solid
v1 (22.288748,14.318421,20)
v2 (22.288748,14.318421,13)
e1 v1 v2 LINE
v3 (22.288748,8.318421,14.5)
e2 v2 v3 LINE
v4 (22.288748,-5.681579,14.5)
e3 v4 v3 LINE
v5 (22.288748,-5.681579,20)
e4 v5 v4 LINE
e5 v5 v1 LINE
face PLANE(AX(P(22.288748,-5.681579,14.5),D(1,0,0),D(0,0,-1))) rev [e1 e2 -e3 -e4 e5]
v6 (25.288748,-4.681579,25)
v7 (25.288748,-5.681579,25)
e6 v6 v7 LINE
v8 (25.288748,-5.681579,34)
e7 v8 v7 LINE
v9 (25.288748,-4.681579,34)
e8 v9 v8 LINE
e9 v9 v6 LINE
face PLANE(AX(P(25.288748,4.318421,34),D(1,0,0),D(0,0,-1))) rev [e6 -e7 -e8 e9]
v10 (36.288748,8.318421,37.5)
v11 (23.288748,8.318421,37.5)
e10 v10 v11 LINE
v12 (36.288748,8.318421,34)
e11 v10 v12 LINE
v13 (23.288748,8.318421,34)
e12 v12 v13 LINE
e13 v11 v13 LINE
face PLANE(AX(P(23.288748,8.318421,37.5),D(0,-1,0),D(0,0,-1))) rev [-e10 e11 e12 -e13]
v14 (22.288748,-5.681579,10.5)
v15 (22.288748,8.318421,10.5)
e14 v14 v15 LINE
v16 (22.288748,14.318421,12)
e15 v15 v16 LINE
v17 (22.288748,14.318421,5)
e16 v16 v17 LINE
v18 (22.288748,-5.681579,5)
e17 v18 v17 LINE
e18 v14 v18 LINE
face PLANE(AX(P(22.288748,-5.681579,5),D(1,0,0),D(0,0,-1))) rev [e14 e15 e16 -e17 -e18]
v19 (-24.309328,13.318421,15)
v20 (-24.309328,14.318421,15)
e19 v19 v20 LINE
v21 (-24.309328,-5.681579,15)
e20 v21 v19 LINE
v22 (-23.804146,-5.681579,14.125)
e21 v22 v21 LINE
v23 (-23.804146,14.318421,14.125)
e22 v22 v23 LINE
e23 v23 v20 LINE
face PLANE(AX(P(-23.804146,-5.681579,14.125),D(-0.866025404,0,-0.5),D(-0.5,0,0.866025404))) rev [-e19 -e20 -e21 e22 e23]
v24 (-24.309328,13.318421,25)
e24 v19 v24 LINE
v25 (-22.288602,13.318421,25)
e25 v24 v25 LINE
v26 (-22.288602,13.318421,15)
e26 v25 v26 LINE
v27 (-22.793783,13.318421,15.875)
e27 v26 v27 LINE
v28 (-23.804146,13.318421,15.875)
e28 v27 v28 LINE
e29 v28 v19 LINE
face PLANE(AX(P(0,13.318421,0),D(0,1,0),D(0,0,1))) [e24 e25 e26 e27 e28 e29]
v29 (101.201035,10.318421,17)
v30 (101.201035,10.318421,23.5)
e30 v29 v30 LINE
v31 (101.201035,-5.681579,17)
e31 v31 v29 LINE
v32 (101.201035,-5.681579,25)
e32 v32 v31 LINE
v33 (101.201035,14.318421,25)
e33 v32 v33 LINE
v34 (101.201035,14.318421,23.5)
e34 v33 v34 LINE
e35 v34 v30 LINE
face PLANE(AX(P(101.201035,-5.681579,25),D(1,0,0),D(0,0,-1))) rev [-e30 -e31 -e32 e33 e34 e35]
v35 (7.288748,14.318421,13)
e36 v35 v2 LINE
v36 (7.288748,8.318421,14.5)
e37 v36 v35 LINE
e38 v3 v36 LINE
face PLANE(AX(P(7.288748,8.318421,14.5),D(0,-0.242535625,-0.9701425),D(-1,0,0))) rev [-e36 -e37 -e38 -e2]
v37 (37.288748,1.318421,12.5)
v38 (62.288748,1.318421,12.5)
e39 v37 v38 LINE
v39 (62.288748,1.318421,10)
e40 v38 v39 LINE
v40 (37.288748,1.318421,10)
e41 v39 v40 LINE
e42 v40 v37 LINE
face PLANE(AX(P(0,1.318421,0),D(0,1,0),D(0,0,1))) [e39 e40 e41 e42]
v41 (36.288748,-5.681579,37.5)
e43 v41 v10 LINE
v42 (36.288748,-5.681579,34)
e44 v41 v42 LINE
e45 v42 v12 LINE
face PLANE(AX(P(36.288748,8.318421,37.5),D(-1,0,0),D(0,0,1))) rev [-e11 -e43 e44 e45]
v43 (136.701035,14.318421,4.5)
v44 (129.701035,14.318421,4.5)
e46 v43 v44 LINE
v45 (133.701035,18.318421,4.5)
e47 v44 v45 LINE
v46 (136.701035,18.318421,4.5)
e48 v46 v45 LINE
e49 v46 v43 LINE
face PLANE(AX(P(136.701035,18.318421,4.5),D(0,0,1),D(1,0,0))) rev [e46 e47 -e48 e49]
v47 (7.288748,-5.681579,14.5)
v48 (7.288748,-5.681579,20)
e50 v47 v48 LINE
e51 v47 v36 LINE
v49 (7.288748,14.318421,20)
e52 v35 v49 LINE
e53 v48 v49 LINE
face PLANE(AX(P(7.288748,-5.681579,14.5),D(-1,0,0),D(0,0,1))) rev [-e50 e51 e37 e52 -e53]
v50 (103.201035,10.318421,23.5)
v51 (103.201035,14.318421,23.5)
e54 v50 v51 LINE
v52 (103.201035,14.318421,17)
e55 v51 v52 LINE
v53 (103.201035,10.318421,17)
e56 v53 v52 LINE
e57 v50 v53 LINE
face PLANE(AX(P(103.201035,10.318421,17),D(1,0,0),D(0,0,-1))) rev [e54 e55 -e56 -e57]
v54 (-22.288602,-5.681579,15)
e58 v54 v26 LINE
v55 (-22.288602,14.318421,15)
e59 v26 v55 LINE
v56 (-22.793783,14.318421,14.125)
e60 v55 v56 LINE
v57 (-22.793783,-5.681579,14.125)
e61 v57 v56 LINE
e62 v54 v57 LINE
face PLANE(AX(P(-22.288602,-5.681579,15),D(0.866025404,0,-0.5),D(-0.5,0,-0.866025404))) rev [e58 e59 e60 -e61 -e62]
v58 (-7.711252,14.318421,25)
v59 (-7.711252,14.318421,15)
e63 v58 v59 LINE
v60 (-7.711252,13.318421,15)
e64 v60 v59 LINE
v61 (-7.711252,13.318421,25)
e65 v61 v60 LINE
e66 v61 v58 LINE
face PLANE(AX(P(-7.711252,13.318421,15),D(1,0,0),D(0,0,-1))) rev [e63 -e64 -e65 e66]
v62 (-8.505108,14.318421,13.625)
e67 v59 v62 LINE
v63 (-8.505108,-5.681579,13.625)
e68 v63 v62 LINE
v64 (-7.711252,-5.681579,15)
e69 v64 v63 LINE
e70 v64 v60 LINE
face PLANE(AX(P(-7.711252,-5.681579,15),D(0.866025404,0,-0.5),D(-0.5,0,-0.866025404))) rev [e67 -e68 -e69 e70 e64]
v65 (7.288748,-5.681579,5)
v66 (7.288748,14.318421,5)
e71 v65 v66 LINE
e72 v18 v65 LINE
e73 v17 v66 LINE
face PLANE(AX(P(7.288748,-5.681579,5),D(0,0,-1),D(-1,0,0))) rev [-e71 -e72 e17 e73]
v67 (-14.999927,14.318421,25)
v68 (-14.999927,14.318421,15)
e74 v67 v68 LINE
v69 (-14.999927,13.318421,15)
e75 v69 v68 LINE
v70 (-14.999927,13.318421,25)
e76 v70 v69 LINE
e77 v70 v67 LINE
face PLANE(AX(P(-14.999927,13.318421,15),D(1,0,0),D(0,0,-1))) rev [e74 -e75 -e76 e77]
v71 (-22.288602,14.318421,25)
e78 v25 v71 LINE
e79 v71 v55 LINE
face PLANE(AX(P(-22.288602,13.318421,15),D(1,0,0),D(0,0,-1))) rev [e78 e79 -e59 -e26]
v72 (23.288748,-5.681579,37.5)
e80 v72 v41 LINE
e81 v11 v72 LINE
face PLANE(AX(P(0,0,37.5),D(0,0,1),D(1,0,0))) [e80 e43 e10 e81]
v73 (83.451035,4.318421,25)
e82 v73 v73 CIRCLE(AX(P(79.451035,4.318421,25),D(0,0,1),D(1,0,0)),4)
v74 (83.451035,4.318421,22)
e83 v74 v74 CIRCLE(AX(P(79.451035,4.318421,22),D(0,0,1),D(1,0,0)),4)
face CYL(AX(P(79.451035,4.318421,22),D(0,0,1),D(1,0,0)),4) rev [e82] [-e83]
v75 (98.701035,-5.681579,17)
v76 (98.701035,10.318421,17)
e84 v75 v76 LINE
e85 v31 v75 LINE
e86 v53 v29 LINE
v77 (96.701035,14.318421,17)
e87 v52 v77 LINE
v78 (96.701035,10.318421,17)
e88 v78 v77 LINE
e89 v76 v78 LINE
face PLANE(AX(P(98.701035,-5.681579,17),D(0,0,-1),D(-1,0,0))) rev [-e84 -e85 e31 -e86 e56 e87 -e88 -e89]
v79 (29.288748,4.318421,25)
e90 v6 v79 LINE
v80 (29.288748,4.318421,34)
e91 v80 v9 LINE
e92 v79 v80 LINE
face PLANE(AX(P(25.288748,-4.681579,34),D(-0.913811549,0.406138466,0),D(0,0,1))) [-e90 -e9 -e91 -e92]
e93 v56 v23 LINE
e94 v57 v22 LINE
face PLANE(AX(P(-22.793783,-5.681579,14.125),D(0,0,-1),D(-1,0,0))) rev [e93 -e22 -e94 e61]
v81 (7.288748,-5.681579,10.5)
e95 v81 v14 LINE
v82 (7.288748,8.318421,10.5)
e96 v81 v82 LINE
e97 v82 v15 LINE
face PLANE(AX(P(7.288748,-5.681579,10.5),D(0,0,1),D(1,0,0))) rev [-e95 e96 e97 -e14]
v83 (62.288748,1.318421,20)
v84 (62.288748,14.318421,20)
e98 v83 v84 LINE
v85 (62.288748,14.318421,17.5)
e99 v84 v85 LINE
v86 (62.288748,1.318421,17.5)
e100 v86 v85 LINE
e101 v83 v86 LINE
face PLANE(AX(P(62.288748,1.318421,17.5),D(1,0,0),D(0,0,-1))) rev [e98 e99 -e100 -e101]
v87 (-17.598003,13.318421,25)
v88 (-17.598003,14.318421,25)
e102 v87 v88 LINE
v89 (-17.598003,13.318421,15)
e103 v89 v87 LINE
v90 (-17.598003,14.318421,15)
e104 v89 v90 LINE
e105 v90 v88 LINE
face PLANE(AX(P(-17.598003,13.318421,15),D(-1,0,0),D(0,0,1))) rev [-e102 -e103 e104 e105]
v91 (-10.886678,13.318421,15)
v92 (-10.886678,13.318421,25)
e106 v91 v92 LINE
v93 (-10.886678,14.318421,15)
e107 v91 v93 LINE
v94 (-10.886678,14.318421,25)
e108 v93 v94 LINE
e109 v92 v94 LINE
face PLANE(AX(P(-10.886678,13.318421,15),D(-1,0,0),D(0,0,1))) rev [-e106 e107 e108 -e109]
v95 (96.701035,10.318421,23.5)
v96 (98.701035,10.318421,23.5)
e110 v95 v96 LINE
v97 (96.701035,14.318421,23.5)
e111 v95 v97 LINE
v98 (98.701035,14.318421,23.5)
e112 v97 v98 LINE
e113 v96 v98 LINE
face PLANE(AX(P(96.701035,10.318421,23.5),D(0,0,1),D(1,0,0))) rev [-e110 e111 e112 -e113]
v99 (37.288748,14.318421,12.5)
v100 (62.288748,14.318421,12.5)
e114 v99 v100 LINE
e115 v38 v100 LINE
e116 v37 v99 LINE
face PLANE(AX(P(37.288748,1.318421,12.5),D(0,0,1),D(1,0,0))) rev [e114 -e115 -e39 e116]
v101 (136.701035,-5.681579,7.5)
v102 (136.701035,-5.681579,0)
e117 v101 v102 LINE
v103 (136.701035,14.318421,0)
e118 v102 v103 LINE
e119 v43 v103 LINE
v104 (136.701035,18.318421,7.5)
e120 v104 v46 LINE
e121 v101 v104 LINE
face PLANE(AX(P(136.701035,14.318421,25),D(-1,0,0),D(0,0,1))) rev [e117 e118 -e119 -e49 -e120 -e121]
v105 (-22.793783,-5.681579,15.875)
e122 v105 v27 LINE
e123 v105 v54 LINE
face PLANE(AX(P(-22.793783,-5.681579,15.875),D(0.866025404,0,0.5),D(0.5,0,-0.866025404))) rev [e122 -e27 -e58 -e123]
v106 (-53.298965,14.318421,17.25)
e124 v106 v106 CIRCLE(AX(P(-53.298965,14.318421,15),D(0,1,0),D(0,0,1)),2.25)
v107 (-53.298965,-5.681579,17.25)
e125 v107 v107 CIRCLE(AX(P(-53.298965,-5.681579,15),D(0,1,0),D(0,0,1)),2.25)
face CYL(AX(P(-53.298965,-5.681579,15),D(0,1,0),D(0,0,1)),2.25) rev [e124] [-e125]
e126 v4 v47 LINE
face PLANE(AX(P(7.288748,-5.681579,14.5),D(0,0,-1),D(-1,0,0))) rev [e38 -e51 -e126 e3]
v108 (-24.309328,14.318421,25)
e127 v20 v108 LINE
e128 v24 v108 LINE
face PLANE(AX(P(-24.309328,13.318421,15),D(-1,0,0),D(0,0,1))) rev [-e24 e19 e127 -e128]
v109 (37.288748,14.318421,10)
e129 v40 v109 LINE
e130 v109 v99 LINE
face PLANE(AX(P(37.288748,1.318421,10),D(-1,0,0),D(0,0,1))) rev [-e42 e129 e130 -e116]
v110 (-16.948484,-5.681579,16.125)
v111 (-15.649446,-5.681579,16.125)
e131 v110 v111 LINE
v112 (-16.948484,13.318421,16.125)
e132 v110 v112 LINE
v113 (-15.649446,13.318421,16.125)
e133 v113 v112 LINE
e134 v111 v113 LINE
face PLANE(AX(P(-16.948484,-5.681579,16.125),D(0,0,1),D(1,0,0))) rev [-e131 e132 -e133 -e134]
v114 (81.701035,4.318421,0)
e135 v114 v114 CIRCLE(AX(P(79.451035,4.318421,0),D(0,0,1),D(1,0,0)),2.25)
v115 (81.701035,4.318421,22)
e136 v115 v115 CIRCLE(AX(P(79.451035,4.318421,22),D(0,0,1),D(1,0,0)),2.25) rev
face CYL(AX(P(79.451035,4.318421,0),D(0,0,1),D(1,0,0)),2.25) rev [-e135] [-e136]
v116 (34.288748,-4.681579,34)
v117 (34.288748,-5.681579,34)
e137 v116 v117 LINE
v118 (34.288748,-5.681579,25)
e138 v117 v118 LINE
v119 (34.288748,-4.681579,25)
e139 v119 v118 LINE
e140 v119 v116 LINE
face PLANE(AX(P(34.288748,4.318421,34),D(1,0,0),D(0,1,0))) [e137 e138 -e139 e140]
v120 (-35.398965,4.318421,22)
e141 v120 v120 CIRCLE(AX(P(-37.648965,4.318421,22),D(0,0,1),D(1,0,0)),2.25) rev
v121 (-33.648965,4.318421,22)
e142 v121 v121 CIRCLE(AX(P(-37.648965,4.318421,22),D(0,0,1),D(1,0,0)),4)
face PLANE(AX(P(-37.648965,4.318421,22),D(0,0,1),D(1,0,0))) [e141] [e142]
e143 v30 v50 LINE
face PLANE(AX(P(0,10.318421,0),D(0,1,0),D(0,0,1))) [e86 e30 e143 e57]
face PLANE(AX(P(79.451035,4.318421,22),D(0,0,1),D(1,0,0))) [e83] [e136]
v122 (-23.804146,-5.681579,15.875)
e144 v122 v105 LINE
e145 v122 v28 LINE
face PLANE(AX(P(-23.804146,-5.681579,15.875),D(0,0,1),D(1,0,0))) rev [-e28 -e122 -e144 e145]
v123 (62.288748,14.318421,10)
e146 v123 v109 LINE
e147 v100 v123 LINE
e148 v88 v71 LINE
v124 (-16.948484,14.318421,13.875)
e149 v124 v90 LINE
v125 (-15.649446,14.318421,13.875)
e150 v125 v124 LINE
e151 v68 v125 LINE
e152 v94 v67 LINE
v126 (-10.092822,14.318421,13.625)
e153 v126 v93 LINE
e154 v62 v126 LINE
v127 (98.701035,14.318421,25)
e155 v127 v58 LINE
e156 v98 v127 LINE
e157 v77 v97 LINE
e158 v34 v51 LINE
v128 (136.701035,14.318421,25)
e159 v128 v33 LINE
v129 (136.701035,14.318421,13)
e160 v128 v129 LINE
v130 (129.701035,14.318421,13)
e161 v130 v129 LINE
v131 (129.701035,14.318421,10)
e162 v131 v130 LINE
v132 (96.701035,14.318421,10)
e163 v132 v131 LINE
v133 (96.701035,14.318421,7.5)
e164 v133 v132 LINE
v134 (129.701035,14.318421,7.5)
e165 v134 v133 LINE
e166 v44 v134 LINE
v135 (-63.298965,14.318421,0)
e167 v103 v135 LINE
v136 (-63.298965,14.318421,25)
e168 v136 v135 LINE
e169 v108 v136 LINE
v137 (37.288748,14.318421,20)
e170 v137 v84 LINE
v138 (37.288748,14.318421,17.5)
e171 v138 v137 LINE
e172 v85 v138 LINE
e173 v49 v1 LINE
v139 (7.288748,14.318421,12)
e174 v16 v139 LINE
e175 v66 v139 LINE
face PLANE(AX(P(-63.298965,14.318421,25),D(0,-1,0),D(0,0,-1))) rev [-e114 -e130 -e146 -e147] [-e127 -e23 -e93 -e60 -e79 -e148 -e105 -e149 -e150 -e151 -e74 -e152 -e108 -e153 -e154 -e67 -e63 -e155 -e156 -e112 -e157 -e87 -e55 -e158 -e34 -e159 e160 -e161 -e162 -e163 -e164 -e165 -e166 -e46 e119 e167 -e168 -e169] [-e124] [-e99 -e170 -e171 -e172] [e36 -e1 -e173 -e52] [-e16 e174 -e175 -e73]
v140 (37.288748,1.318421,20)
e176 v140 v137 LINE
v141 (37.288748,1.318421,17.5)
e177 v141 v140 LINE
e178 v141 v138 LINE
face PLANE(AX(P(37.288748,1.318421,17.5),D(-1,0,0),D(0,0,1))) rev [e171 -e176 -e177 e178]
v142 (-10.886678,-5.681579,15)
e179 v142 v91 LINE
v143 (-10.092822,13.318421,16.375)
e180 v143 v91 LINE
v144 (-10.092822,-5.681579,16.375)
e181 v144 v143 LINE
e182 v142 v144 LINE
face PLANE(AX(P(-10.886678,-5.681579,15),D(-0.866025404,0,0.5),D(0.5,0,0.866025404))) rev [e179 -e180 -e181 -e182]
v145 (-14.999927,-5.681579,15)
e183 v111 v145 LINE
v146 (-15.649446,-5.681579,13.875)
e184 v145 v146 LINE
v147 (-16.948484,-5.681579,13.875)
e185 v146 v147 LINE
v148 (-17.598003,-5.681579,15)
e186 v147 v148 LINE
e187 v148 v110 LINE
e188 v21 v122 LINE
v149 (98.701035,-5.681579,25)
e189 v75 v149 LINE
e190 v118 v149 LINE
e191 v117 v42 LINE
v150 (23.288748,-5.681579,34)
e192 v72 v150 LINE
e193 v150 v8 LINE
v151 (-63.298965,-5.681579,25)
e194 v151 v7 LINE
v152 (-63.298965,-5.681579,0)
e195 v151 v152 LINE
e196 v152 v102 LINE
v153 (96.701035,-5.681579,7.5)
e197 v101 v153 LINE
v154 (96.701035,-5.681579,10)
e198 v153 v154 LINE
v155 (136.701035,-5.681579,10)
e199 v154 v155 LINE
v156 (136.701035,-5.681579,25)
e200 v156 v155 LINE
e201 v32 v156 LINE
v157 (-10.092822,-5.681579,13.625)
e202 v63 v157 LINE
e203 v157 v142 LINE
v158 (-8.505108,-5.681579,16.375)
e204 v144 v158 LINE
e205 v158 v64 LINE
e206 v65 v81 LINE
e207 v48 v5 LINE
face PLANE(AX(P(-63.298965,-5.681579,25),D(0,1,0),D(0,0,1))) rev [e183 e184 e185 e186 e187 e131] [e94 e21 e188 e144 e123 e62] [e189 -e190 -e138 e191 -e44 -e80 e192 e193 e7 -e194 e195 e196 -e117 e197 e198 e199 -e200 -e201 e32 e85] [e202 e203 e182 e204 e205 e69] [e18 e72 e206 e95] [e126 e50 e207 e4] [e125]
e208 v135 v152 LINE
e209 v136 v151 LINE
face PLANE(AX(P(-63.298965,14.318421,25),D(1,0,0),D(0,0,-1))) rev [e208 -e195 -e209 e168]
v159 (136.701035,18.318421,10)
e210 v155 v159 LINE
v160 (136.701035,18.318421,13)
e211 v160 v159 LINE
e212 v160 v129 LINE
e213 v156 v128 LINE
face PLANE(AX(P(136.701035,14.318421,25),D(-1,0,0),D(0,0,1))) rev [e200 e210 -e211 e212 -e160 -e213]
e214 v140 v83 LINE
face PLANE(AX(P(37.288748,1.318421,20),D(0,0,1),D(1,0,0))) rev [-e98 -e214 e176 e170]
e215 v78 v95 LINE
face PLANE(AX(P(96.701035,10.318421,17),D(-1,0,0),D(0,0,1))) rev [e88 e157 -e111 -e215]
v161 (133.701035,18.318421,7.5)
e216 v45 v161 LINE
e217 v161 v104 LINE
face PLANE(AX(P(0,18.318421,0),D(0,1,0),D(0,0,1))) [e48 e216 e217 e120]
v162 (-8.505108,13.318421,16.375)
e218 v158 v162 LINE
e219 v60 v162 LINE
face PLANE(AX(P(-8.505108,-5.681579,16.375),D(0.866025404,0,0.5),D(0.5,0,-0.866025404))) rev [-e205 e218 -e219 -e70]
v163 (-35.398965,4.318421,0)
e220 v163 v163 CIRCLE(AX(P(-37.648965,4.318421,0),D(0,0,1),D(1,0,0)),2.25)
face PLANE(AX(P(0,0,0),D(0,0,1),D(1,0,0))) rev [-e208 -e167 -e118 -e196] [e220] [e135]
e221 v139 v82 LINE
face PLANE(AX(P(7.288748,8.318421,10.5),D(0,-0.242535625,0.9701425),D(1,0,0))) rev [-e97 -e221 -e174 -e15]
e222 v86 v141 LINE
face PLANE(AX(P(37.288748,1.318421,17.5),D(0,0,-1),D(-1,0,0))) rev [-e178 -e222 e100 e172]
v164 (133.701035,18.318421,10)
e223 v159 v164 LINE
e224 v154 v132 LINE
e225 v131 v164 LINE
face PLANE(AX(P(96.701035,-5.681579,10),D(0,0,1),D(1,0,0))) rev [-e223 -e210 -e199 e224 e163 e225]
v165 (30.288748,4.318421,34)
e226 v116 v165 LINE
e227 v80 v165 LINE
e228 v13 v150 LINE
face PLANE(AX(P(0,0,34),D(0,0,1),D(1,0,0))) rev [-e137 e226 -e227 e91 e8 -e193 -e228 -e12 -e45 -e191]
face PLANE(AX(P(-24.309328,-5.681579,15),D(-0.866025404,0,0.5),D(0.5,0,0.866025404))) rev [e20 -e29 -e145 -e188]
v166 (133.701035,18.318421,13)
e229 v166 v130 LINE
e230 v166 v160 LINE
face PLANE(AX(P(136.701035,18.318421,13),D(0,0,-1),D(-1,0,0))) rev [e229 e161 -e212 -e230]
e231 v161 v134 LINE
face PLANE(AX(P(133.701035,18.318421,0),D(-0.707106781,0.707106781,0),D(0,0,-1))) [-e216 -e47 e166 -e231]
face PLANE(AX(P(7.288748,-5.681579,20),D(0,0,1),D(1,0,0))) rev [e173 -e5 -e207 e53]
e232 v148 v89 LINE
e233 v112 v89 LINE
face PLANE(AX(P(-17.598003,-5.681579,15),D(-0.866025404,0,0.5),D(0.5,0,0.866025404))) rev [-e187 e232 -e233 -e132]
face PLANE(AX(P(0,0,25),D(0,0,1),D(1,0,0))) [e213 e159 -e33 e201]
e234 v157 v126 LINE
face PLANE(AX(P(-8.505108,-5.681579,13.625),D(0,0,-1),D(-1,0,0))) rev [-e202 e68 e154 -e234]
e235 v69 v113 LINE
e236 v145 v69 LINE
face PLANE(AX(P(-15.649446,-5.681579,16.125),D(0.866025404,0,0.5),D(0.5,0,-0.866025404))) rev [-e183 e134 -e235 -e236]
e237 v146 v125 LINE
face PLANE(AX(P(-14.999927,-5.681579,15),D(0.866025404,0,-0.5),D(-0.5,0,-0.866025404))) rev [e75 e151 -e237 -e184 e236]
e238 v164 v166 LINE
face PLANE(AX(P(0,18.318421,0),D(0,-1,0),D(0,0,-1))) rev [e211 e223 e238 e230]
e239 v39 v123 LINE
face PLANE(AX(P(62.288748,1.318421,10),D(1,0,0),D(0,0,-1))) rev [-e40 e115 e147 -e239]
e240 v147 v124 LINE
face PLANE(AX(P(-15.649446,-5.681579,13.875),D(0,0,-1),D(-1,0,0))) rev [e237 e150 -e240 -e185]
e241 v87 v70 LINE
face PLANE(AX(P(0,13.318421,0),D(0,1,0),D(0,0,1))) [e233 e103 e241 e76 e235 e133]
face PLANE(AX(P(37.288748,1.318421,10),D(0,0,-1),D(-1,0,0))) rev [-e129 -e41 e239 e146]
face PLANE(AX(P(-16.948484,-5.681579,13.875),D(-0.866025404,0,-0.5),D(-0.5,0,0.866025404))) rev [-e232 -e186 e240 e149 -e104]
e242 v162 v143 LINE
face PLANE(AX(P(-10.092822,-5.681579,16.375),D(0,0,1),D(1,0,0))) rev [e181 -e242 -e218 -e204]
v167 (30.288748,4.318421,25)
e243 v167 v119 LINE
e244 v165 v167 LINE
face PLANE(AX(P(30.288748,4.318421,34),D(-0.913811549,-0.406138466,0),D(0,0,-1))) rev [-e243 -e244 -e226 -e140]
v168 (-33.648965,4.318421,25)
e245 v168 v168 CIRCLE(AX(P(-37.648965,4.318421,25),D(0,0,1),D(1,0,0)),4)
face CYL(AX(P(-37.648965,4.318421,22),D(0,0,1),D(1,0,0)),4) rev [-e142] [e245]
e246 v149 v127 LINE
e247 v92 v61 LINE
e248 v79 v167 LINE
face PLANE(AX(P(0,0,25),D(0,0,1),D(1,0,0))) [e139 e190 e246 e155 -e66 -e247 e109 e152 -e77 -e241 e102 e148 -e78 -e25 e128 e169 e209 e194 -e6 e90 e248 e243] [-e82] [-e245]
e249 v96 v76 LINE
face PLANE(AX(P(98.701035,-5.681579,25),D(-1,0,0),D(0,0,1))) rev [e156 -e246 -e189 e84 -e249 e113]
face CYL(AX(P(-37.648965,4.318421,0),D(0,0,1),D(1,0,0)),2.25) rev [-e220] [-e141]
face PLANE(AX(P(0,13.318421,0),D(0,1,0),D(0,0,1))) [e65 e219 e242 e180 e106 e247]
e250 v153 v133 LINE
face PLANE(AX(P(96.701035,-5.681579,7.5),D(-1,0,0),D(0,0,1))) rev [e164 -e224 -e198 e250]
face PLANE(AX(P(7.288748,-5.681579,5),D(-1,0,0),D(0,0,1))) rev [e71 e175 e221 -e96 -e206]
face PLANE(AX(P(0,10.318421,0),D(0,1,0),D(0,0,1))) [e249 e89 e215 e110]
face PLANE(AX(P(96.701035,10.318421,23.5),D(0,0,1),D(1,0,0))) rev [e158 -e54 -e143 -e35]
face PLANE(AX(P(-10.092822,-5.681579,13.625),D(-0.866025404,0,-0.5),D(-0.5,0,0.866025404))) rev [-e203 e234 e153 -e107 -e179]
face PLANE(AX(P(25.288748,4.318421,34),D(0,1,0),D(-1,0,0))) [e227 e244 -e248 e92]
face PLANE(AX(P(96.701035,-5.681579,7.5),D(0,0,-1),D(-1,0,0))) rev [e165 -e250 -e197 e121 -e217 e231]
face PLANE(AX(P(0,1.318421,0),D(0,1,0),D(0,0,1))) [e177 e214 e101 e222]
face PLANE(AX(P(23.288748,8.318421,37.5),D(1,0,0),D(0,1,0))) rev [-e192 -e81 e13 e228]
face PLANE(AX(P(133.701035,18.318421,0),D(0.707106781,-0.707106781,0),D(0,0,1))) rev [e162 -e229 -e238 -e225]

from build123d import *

# Parameters (mm, degrees)
SCHIZZO1_W                    = 200
SCHIZZO1_H                    = 20
ESTRUSIONE_ESTRUSIONE1_DEPTH  = 25
SCHIZZO2_R                    = 2.25
TAGLIO_ESTRUSIONE1_DEPTH      = 141.400046302
SCHIZZO4_W                    = 2.020725942
SCHIZZO4_H                    = 10
SCHIZZO4_W_2                  = 2.598076211
SCHIZZO4_W_3                  = 3.175426481
TAGLIO_ESTRUSIONE2_DEPTH      = 1
SCHIZZO7_W                    = 15
SCHIZZO7_H                    = 5.5
TAGLIO_ESTRUSIONE3_DEPTH      = 141.400046302
SMUSSO1_SIZE                  = 1.5
SMUSSO1_SIZE2                 = 6
SCHIZZO8_W                    = 25
SCHIZZO8_H                    = 2.5
TAGLIO_ESTRUSIONE4_DEPTH      = 13
SCHIZZO9_W                    = 40
SCHIZZO9_H                    = 2.5
TAGLIO_ESTRUSIONE5_DEPTH      = 141.400046302
SCHIZZO10_W                   = 7
SCHIZZO10_H                   = 3
ESTRUSIONE_ESTRUSIONE5_DEPTH  = 4
SMUSSO2_SIZE                  = 4
SCHIZZO11_W                   = 2.5
SCHIZZO11_H                   = 8
TAGLIO_ESTRUSIONE6_DEPTH      = 141.400046302
SCHIZZO12_W                   = 6.5
SCHIZZO12_H                   = 6.5
TAGLIO_ESTRUSIONE7_DEPTH      = 4
SCHIZZO13_W                   = 9
SCHIZZO13_H                   = 10
ESTRUSIONE_ESTRUSIONE9_DEPTH  = 9
SCHIZZO14_W                   = 13
SCHIZZO14_H                   = 14
ESTRUSIONE_ESTRUSIONE10_DEPTH = 3.5
SMUSSO3_SIZE                  = 9
SMUSSO3_SIZE2                 = 4
SMUSSO4_SIZE                  = 4
SMUSSO4_SIZE2                 = 9
SCHIZZO16_R                   = 2.25
TAGLIO_ESTRUSIONE8_DEPTH      = 141.17038757
SCHIZZO17_R                   = 4
TAGLIO_ESTRUSIONE9_DEPTH      = 3


with BuildPart() as part:
    # Schizzo1 → Estrusione-Estrusione1 (new body)
    with BuildSketch(Plane.XY):
        with Locations((36.701035116, 4.318421053)):
            Rectangle(SCHIZZO1_W, SCHIZZO1_H)
    extrude(amount=ESTRUSIONE_ESTRUSIONE1_DEPTH)

    # Schizzo2 → Taglio-Estrusione1 (cut, through all)
    with BuildSketch(Plane(origin=(0, 14.318421053, 0), x_dir=(1, 0, 0), z_dir=(0, 1, 0))):
        with Locations(Location((-53.298964884, -15, 0), (0, 0, 270))):
            Circle(SCHIZZO2_R)
        Polygon((-23.80414637, -15.875), (-22.793783399, -15.875), (-22.288601913, -15), (-22.793783399, -14.125), (-23.80414637, -14.125), (-24.309327855, -15), align=None)
        Polygon((-14.999926779, -15), (-15.649445831, -13.875), (-16.948483937, -13.875), (-17.59800299, -15), (-16.948483937, -16.125), (-15.649445831, -16.125), align=None)
        Polygon((-8.505108264, -16.375), (-7.711251644, -15), (-8.505108264, -13.625), (-10.092821504, -13.625), (-10.886678125, -15), (-10.092821504, -16.375), align=None)
    extrude(amount=-TAGLIO_ESTRUSIONE1_DEPTH, mode=Mode.SUBTRACT)

    # Schizzo4 → Taglio-Estrusione2 (cut)
    with BuildSketch(Plane(origin=(0, 14.318421053, 0), x_dir=(1, 0, 0), z_dir=(0, 1, 0))):
        with Locations((-23.298964884, -20)):
            Rectangle(SCHIZZO4_W, SCHIZZO4_H)
        with Locations((-16.298964885, -20)):
            Rectangle(SCHIZZO4_W_2, SCHIZZO4_H)
        with Locations((-9.298964885, -20)):
            Rectangle(SCHIZZO4_W_3, SCHIZZO4_H)
    extrude(amount=-TAGLIO_ESTRUSIONE2_DEPTH, mode=Mode.SUBTRACT)

    # Schizzo7 → Taglio-Estrusione3 (cut, through all)
    with BuildSketch(Plane(origin=(0, 14.318421053, 0), x_dir=(1, 0, 0), z_dir=(0, 1, 0))):
        with Locations((14.788748356, -17.25)):
            Rectangle(SCHIZZO7_W, SCHIZZO7_H)
        with Locations((14.788748356, -7.75)):
            Rectangle(SCHIZZO7_W, SCHIZZO7_H)
    extrude(amount=-TAGLIO_ESTRUSIONE3_DEPTH, mode=Mode.SUBTRACT)

    # Smusso1
    smusso1_edges = [part.edges().sort_by_distance(p)[0] for p in [
        (14.788748356, 14.318421053, 14.5),
        (14.788748356, 14.318421053, 10.5),
    ]]
    smusso1_side = [part.faces().sort_by_distance(p)[0] for p in [
        (38.695689024, 14.318421053, 12.36530447),
    ]]
    chamfer(smusso1_edges, length=SMUSSO1_SIZE, length2=SMUSSO1_SIZE2, reference=smusso1_side[0])

    # Schizzo8 → Taglio-Estrusione4 (cut)
    with BuildSketch(Plane(origin=(0, 14.318421053, 0), x_dir=(1, 0, 0), z_dir=(0, 1, 0))):
        with Locations((49.788748356, -18.75)):
            Rectangle(SCHIZZO8_W, SCHIZZO8_H)
        with Locations((49.788748356, -11.25)):
            Rectangle(SCHIZZO8_W, SCHIZZO8_H)
    extrude(amount=-TAGLIO_ESTRUSIONE4_DEPTH, mode=Mode.SUBTRACT)

    # Schizzo9 → Taglio-Estrusione5 (cut, through all)
    with BuildSketch(Plane(origin=(0, 14.318421053, 0), x_dir=(1, 0, 0), z_dir=(0, 1, 0))):
        with Locations((116.701035116, -8.75)):
            Rectangle(SCHIZZO9_W, SCHIZZO9_H)
    extrude(amount=-TAGLIO_ESTRUSIONE5_DEPTH, mode=Mode.SUBTRACT)

    # Schizzo10 → Estrusione-Estrusione5 (add)
    with BuildSketch(Plane(origin=(0, 14.318421053, 0), x_dir=(1, 0, 0), z_dir=(0, 1, 0))):
        with Locations((133.201035116, -6)):
            Rectangle(SCHIZZO10_W, SCHIZZO10_H)
        with Locations((133.201035116, -11.5)):
            Rectangle(SCHIZZO10_W, SCHIZZO10_H)
    extrude(amount=ESTRUSIONE_ESTRUSIONE5_DEPTH)

    # Smusso2
    smusso2_edges = [part.edges().sort_by_distance(p)[0] for p in [
        (129.701035116, 18.318421053, 11.5),
        (129.701035116, 18.318421053, 6),
    ]]
    chamfer(smusso2_edges, length=SMUSSO2_SIZE - 0.0001)  # a hair under: the kernel refuses the full size

    # Schizzo11 → Taglio-Estrusione6 (cut, through all)
    with BuildSketch(Plane(origin=(0, 14.318421053, 0), x_dir=(1, 0, 0), z_dir=(0, 1, 0))):
        with Locations((99.951035116, -21)):
            Rectangle(SCHIZZO11_W, SCHIZZO11_H)
    extrude(amount=-TAGLIO_ESTRUSIONE6_DEPTH, mode=Mode.SUBTRACT)

    # Schizzo12 → Taglio-Estrusione7 (cut)
    with BuildSketch(Plane(origin=(0, 14.318421053, 0), x_dir=(1, 0, 0), z_dir=(0, 1, 0))):
        with Locations((99.951035116, -20.25)):
            Rectangle(SCHIZZO12_W, SCHIZZO12_H)
    extrude(amount=-TAGLIO_ESTRUSIONE7_DEPTH, mode=Mode.SUBTRACT)

    # Schizzo13 → Estrusione-Estrusione9 (add)
    with BuildSketch(Plane.XY.offset(25)):
        with Locations((29.788748356, -0.681578947)):
            Rectangle(SCHIZZO13_W, SCHIZZO13_H)
    extrude(amount=ESTRUSIONE_ESTRUSIONE9_DEPTH)

    # Schizzo14 → Estrusione-Estrusione10 (add)
    with BuildSketch(Plane.XY.offset(34)):
        with Locations((29.788748356, 1.318421053)):
            Rectangle(SCHIZZO14_W, SCHIZZO14_H)
    extrude(amount=ESTRUSIONE_ESTRUSIONE10_DEPTH)

    # Smusso3
    smusso3_edges = [part.edges().sort_by_distance(p)[0] for p in [
        (34.288748356, 4.318421053, 29.5),
    ]]
    smusso3_side = [part.faces().sort_by_distance(p)[0] for p in [
        (34.288748356, -0.681578947, 29.5),
    ]]
    chamfer(smusso3_edges, length=SMUSSO3_SIZE, length2=SMUSSO3_SIZE2, reference=smusso3_side[0])

    # Smusso4
    smusso4_edges = [part.edges().sort_by_distance(p)[0] for p in [
        (25.288748356, 4.318421053, 29.5),
    ]]
    smusso4_side = [part.faces().sort_by_distance(p)[0] for p in [
        (27.788748356, 4.318421053, 29.5),
    ]]
    chamfer(smusso4_edges, length=SMUSSO4_SIZE, length2=SMUSSO4_SIZE2, reference=smusso4_side[0])

    # Schizzo16 → Taglio-Estrusione8 (cut, through all)
    with BuildSketch(Plane.XY.offset(25)):
        with Locations((-37.648964884, 4.318421053)):
            Circle(SCHIZZO16_R)
        with Locations((79.451035116, 4.318421053)):
            Circle(SCHIZZO16_R)
    extrude(amount=-TAGLIO_ESTRUSIONE8_DEPTH, mode=Mode.SUBTRACT)

    # Schizzo17 → Taglio-Estrusione9 (cut)
    with BuildSketch(Plane.XY.offset(25)):
        with Locations((-37.648964884, 4.318421053)):
            Circle(SCHIZZO17_R)
        with Locations((79.451035116, 4.318421053)):
            Circle(SCHIZZO17_R)
    extrude(amount=-TAGLIO_ESTRUSIONE9_DEPTH, mode=Mode.SUBTRACT)


solid = part.part
